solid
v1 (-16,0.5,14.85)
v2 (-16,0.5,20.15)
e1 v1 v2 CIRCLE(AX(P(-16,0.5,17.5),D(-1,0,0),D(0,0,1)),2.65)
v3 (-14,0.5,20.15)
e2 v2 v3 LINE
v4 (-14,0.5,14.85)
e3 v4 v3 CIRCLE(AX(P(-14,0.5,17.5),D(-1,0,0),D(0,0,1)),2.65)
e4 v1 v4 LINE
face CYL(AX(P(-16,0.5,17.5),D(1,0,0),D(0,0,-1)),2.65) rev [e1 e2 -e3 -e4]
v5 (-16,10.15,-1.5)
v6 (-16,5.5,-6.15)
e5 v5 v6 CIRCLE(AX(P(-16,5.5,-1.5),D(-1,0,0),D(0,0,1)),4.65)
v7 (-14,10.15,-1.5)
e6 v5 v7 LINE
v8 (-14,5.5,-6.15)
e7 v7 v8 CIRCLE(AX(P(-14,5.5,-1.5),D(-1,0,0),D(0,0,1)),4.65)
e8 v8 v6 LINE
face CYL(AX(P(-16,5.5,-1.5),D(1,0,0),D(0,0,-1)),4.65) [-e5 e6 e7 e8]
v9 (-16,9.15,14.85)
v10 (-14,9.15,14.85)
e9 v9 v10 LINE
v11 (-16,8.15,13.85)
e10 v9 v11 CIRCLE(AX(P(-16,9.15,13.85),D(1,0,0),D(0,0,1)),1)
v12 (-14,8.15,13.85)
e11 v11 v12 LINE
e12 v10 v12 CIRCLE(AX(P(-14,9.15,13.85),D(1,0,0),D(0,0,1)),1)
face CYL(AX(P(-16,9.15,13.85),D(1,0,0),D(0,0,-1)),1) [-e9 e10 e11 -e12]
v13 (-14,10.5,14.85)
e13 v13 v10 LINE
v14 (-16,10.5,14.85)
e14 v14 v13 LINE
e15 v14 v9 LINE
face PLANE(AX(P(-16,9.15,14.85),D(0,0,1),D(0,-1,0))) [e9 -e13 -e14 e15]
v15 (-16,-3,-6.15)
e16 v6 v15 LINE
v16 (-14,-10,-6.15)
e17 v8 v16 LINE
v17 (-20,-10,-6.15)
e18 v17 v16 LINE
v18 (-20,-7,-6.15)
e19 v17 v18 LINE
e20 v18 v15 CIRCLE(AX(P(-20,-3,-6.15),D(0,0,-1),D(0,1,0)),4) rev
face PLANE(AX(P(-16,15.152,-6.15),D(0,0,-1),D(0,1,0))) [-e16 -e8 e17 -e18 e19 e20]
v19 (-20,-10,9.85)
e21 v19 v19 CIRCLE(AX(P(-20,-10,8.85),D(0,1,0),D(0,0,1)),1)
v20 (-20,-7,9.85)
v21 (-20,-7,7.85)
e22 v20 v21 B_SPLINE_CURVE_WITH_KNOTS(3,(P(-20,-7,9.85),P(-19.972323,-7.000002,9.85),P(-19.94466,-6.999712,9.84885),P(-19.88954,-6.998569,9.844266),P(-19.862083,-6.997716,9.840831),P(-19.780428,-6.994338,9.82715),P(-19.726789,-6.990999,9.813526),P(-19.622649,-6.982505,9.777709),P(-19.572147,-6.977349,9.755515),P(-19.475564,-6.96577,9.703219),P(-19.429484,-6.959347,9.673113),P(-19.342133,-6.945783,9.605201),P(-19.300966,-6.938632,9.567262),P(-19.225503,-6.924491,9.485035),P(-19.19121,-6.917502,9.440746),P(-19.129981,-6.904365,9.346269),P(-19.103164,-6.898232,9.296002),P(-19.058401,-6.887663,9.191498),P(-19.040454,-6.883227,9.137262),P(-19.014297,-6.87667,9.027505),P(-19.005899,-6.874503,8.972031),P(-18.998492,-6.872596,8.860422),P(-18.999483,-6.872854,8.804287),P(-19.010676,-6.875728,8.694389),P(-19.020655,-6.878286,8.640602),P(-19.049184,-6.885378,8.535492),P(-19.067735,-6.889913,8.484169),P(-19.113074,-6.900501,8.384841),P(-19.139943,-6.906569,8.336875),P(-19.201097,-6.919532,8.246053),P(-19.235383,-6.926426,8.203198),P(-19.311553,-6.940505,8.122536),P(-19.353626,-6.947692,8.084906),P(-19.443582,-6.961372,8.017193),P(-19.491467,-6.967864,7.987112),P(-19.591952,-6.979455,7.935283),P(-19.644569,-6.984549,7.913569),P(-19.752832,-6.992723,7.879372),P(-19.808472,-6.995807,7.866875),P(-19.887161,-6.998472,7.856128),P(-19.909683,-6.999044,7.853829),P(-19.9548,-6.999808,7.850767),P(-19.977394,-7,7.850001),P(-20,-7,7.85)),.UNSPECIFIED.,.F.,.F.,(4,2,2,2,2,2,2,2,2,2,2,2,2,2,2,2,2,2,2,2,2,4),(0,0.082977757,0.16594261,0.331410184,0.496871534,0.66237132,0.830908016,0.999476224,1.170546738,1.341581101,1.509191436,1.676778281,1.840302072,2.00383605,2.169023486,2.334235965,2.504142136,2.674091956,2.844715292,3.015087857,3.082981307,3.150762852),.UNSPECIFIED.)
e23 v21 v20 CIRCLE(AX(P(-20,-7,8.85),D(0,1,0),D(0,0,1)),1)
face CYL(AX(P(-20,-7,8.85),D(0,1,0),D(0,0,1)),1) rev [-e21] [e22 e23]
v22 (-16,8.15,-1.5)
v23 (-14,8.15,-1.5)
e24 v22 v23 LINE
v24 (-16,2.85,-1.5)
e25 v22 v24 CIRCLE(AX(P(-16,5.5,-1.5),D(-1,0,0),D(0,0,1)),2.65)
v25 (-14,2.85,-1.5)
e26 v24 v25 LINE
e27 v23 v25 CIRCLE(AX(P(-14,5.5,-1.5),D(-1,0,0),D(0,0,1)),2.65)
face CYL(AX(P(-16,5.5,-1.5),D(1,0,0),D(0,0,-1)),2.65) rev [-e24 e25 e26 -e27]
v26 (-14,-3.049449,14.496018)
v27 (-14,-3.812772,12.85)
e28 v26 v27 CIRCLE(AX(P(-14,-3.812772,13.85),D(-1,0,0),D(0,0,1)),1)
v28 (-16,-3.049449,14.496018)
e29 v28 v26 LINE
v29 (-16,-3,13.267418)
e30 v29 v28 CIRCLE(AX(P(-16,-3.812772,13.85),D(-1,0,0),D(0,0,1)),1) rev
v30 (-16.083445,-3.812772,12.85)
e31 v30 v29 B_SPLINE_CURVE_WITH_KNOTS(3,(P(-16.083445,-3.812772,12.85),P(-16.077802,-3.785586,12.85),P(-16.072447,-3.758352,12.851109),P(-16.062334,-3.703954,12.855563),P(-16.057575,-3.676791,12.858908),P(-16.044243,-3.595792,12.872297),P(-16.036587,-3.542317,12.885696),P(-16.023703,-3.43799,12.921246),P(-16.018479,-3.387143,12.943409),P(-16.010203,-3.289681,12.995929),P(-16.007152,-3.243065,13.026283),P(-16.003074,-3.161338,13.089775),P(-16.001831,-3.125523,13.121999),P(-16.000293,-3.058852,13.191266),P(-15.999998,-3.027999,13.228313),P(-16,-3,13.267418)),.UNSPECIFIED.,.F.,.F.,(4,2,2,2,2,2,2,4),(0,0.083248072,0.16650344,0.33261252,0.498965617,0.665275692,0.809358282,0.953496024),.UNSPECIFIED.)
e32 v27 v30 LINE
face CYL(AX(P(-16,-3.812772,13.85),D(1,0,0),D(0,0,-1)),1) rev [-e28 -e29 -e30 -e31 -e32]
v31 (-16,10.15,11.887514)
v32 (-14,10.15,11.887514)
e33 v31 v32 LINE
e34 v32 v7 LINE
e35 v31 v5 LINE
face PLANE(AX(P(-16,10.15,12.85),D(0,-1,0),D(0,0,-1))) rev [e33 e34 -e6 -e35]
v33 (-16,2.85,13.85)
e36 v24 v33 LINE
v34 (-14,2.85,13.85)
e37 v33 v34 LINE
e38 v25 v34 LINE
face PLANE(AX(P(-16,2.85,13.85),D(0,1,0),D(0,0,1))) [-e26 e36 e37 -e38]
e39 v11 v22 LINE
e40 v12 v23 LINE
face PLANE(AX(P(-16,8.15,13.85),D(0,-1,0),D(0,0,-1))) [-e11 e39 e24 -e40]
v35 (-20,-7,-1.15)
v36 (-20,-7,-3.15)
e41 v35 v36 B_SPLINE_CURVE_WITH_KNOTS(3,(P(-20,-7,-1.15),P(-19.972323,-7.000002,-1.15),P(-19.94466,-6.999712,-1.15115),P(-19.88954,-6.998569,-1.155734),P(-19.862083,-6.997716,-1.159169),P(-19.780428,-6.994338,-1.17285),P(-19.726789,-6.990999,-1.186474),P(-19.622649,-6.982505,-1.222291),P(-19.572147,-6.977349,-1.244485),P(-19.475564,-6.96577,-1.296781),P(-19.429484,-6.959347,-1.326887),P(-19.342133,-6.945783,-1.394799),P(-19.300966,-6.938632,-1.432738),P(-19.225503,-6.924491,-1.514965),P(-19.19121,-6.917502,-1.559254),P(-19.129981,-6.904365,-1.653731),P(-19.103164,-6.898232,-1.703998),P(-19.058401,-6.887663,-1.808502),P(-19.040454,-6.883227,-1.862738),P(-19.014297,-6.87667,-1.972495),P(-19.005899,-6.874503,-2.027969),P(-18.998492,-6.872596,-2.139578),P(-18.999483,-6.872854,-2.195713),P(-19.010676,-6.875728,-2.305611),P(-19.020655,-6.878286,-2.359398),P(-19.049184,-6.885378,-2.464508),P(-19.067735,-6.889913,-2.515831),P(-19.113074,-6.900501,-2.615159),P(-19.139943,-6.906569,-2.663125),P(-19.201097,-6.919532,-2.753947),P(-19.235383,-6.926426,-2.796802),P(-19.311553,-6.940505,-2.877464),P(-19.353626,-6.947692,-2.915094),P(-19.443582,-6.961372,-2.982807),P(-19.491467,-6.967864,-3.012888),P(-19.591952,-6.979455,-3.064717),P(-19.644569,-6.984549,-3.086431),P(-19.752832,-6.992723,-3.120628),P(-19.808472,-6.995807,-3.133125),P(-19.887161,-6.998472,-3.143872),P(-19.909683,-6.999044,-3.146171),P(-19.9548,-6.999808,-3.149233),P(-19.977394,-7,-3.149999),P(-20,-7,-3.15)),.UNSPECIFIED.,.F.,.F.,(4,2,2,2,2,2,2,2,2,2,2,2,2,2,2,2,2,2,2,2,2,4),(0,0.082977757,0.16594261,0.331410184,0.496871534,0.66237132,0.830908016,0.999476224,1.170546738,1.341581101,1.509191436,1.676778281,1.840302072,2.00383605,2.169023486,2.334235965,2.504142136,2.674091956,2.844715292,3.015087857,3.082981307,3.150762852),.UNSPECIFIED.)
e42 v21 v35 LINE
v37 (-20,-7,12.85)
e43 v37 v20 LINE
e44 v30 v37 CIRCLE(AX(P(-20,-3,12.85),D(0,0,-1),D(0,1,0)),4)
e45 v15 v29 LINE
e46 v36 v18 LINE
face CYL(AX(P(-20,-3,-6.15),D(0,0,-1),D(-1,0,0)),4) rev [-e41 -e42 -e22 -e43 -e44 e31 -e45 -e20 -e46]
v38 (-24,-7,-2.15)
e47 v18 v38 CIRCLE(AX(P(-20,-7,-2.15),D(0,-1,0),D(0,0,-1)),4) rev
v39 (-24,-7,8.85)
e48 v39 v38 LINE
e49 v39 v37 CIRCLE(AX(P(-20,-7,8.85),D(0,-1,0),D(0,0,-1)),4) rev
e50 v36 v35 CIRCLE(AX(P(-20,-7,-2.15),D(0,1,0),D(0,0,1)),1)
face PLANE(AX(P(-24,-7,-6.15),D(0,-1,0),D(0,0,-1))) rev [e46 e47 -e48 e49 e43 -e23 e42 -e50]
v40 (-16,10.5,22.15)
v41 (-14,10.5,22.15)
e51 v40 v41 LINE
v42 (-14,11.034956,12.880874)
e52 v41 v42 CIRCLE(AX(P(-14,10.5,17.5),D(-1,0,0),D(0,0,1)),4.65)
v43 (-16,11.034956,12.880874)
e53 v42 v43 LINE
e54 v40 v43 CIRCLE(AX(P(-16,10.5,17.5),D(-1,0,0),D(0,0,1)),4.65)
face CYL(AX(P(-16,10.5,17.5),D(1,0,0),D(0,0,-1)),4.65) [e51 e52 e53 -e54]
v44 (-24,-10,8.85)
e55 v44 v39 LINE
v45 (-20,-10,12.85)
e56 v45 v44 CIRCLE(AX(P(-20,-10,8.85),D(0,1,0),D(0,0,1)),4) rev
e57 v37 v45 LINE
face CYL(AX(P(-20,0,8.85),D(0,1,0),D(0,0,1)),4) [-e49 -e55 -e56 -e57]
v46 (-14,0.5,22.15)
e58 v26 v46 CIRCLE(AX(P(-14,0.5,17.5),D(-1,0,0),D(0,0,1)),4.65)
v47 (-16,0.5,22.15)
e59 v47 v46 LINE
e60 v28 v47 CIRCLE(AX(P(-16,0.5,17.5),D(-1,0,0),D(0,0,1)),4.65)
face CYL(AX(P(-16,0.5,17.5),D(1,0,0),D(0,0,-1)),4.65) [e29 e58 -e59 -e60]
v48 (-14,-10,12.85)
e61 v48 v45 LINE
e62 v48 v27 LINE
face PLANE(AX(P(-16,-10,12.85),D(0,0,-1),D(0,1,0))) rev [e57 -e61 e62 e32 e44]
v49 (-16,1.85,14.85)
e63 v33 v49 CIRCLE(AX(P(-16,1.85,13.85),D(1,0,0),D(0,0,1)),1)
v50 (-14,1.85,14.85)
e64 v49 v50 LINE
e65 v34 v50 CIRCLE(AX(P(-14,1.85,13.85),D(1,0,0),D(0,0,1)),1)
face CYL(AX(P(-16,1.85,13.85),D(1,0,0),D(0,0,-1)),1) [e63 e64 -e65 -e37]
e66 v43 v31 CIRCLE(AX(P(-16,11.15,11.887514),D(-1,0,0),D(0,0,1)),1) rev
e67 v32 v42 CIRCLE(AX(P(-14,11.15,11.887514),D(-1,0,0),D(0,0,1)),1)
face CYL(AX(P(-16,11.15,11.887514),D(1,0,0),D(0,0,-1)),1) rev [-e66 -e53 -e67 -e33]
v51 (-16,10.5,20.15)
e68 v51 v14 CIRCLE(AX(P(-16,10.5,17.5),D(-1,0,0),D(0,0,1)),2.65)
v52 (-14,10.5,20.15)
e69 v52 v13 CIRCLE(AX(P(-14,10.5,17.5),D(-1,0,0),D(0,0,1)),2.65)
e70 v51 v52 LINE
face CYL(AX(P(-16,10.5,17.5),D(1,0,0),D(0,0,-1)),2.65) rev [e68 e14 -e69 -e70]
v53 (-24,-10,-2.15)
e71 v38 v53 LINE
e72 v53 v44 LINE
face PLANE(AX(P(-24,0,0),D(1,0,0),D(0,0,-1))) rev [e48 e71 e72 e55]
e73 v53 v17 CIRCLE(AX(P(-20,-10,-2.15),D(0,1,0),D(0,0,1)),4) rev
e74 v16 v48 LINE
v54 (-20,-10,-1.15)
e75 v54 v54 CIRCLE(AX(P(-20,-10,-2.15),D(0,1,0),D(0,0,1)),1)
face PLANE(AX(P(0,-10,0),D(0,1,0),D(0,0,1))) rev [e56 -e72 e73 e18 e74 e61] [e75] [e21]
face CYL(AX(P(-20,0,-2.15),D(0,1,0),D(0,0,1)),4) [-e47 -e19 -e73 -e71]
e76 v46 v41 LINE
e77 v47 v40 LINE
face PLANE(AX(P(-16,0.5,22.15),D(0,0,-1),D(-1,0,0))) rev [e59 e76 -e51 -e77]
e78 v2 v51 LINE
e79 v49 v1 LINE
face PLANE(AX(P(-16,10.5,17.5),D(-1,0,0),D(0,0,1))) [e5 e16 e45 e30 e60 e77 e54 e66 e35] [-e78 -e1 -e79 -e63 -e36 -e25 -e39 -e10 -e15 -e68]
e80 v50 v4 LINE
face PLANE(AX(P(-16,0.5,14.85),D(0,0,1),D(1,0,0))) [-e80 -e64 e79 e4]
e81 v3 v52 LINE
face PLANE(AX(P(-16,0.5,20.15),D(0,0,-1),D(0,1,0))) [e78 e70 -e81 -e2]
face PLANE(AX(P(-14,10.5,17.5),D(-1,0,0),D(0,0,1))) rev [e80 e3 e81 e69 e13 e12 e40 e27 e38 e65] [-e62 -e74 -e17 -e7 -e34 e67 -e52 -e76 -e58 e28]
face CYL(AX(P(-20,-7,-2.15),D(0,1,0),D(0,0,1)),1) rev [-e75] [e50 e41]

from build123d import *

# Parameters (mm, degrees)
BOSS_EXTRUDE1_DEPTH = 2
BOSS_EXTRUDE2_START = -16
BOSS_EXTRUDE2_DEPTH = 2
SKETCH3_W           = 19
SKETCH3_H           = 3
BOSS_EXTRUDE3_DEPTH = 8
FILLET1_R           = 4
SKETCH5_W           = 1
SKETCH5_H           = 3
HOLE1_AT_2_COUNT    = 2
HOLE1_AT_2_PITCH    = 11
CUT_EXTRUDE1_START  = 2
SKETCH6_R           = 1
CUT_EXTRUDE1_DEPTH  = 2
FILLET2_R           = 1


# Read off the part's stored shape, not the designer's step: Boss-Extrude2
with BuildPart() as part:
    # Sketch1 → Boss-Extrude1 (new body)
    with BuildSketch(Plane.ZY.offset(14)):
        with BuildLine():
            Line((12.85, 10.15), (-1.5, 10.15))
            ThreePointArc((-1.5, 10.15), (-6.15, 5.5), (-1.5, 0.85))
            Line((-1.5, 0.85), (12.85, 0.85))
            Line((12.85, 0.85), (12.85, 0.5))
            ThreePointArc((12.85, 0.5), (17.5, -4.15), (22.15, 0.5))
            Line((22.15, 0.5), (22.15, 10.5))
            ThreePointArc((22.15, 10.5), (17.5, 15.15), (12.85, 10.5))
            Line((12.85, 10.5), (12.85, 10.15))
        make_face()
        with BuildLine():
            Line((13.85, 8.15), (-1.5, 8.15))
            ThreePointArc((-1.5, 8.15), (-4.15, 5.5), (-1.5, 2.85))
            Line((-1.5, 2.85), (13.85, 2.85))
            ThreePointArc((13.85, 2.85), (14.557106781, 2.557106781), (14.85, 1.85))
            Line((14.85, 1.85), (14.85, 0.5))
            ThreePointArc((14.85, 0.5), (17.5, -2.15), (20.15, 0.5))
            Line((20.15, 0.5), (20.15, 10.5))
            ThreePointArc((20.15, 10.5), (17.5, 13.15), (14.85, 10.5))
            Line((14.85, 10.5), (14.85, 9.15))
            ThreePointArc((14.85, 9.15), (14.557106781, 8.442893219), (13.85, 8.15))
        make_face(mode=Mode.SUBTRACT)
    extrude(amount=BOSS_EXTRUDE1_DEPTH)

    # Boss-Extrude2 outline → Boss-Extrude2 (add)
    with BuildSketch(Plane.YZ.offset(BOSS_EXTRUDE2_START)):
        with BuildLine():
            Line((-10, 12.85), (-10, -6.15))
            Line((-10, -6.15), (5.5, -6.15))
            ThreePointArc((5.5, -6.15), (2.211953467, -4.788046533), (0.85, -1.5))
            Line((0.85, -1.5), (0.85, 12.85))
            Line((0.85, 12.85), (-10, 12.85))
        make_face()
    extrude(amount=BOSS_EXTRUDE2_DEPTH)

    # Sketch3 → Boss-Extrude3 (add)
    with BuildSketch(Plane.ZY.offset(16)):
        with Locations((3.35, -8.5)):
            Rectangle(SKETCH3_W, SKETCH3_H)
    extrude(amount=BOSS_EXTRUDE3_DEPTH)

    # Fillet1
    fillet1_edges = [part.edges().sort_by_distance(p)[0] for p in [
        (-24, -8.5, 12.85),
        (-24, -8.5, -6.15),
        (-16, -7, 3.35),
    ]]
    fillet(fillet1_edges, radius=FILLET1_R - 0.0001)  # a hair under: the kernel refuses the full size

    # Sketch5 → Hole1 (revolve, cut)
    with BuildSketch(Plane(origin=(-20, -7, -2.15), x_dir=(0, 0, 1), z_dir=(1, 0, 0))):
        with Locations((0.5, 1.5)):
            Rectangle(SKETCH5_W, SKETCH5_H)
    hole1 = revolve(axis=Axis((-20, -117, -2.15), (0, 1, 0)), mode=Mode.SUBTRACT)

    # Hole1 at 2: Hole1 ×2
    with Locations(*[(0, 0, i * HOLE1_AT_2_PITCH) for i in range(1, HOLE1_AT_2_COUNT)]):
        add(hole1, mode=Mode.SUBTRACT)

    # Sketch6 → Cut-Extrude1 (cut)
    with BuildSketch(Plane(origin=(0, -7, 0), x_dir=(1, 0, 0), z_dir=(0, 1, 0)).offset(CUT_EXTRUDE1_START)):
        with Locations(Location((-20, -8.85, 0), (0, 0, 270))):
            Circle(SKETCH6_R)
        with Locations(Location((-20, 2.15, 0), (0, 0, 270))):
            Circle(SKETCH6_R)
    extrude(amount=-CUT_EXTRUDE1_DEPTH, mode=Mode.SUBTRACT)

    # Fillet2
    fillet2_edges = [part.edges().sort_by_distance(p)[0] for p in [
        (-15, 10.15, 12.85),
    ]]
    fillet(fillet2_edges, radius=FILLET2_R)
    fillet2_2_edges = [part.edges().sort_by_distance(p)[0] for p in [
        (-15, 0.5, 12.85),
    ]]
    fillet(fillet2_2_edges, radius=FILLET2_R)


solid = part.part
